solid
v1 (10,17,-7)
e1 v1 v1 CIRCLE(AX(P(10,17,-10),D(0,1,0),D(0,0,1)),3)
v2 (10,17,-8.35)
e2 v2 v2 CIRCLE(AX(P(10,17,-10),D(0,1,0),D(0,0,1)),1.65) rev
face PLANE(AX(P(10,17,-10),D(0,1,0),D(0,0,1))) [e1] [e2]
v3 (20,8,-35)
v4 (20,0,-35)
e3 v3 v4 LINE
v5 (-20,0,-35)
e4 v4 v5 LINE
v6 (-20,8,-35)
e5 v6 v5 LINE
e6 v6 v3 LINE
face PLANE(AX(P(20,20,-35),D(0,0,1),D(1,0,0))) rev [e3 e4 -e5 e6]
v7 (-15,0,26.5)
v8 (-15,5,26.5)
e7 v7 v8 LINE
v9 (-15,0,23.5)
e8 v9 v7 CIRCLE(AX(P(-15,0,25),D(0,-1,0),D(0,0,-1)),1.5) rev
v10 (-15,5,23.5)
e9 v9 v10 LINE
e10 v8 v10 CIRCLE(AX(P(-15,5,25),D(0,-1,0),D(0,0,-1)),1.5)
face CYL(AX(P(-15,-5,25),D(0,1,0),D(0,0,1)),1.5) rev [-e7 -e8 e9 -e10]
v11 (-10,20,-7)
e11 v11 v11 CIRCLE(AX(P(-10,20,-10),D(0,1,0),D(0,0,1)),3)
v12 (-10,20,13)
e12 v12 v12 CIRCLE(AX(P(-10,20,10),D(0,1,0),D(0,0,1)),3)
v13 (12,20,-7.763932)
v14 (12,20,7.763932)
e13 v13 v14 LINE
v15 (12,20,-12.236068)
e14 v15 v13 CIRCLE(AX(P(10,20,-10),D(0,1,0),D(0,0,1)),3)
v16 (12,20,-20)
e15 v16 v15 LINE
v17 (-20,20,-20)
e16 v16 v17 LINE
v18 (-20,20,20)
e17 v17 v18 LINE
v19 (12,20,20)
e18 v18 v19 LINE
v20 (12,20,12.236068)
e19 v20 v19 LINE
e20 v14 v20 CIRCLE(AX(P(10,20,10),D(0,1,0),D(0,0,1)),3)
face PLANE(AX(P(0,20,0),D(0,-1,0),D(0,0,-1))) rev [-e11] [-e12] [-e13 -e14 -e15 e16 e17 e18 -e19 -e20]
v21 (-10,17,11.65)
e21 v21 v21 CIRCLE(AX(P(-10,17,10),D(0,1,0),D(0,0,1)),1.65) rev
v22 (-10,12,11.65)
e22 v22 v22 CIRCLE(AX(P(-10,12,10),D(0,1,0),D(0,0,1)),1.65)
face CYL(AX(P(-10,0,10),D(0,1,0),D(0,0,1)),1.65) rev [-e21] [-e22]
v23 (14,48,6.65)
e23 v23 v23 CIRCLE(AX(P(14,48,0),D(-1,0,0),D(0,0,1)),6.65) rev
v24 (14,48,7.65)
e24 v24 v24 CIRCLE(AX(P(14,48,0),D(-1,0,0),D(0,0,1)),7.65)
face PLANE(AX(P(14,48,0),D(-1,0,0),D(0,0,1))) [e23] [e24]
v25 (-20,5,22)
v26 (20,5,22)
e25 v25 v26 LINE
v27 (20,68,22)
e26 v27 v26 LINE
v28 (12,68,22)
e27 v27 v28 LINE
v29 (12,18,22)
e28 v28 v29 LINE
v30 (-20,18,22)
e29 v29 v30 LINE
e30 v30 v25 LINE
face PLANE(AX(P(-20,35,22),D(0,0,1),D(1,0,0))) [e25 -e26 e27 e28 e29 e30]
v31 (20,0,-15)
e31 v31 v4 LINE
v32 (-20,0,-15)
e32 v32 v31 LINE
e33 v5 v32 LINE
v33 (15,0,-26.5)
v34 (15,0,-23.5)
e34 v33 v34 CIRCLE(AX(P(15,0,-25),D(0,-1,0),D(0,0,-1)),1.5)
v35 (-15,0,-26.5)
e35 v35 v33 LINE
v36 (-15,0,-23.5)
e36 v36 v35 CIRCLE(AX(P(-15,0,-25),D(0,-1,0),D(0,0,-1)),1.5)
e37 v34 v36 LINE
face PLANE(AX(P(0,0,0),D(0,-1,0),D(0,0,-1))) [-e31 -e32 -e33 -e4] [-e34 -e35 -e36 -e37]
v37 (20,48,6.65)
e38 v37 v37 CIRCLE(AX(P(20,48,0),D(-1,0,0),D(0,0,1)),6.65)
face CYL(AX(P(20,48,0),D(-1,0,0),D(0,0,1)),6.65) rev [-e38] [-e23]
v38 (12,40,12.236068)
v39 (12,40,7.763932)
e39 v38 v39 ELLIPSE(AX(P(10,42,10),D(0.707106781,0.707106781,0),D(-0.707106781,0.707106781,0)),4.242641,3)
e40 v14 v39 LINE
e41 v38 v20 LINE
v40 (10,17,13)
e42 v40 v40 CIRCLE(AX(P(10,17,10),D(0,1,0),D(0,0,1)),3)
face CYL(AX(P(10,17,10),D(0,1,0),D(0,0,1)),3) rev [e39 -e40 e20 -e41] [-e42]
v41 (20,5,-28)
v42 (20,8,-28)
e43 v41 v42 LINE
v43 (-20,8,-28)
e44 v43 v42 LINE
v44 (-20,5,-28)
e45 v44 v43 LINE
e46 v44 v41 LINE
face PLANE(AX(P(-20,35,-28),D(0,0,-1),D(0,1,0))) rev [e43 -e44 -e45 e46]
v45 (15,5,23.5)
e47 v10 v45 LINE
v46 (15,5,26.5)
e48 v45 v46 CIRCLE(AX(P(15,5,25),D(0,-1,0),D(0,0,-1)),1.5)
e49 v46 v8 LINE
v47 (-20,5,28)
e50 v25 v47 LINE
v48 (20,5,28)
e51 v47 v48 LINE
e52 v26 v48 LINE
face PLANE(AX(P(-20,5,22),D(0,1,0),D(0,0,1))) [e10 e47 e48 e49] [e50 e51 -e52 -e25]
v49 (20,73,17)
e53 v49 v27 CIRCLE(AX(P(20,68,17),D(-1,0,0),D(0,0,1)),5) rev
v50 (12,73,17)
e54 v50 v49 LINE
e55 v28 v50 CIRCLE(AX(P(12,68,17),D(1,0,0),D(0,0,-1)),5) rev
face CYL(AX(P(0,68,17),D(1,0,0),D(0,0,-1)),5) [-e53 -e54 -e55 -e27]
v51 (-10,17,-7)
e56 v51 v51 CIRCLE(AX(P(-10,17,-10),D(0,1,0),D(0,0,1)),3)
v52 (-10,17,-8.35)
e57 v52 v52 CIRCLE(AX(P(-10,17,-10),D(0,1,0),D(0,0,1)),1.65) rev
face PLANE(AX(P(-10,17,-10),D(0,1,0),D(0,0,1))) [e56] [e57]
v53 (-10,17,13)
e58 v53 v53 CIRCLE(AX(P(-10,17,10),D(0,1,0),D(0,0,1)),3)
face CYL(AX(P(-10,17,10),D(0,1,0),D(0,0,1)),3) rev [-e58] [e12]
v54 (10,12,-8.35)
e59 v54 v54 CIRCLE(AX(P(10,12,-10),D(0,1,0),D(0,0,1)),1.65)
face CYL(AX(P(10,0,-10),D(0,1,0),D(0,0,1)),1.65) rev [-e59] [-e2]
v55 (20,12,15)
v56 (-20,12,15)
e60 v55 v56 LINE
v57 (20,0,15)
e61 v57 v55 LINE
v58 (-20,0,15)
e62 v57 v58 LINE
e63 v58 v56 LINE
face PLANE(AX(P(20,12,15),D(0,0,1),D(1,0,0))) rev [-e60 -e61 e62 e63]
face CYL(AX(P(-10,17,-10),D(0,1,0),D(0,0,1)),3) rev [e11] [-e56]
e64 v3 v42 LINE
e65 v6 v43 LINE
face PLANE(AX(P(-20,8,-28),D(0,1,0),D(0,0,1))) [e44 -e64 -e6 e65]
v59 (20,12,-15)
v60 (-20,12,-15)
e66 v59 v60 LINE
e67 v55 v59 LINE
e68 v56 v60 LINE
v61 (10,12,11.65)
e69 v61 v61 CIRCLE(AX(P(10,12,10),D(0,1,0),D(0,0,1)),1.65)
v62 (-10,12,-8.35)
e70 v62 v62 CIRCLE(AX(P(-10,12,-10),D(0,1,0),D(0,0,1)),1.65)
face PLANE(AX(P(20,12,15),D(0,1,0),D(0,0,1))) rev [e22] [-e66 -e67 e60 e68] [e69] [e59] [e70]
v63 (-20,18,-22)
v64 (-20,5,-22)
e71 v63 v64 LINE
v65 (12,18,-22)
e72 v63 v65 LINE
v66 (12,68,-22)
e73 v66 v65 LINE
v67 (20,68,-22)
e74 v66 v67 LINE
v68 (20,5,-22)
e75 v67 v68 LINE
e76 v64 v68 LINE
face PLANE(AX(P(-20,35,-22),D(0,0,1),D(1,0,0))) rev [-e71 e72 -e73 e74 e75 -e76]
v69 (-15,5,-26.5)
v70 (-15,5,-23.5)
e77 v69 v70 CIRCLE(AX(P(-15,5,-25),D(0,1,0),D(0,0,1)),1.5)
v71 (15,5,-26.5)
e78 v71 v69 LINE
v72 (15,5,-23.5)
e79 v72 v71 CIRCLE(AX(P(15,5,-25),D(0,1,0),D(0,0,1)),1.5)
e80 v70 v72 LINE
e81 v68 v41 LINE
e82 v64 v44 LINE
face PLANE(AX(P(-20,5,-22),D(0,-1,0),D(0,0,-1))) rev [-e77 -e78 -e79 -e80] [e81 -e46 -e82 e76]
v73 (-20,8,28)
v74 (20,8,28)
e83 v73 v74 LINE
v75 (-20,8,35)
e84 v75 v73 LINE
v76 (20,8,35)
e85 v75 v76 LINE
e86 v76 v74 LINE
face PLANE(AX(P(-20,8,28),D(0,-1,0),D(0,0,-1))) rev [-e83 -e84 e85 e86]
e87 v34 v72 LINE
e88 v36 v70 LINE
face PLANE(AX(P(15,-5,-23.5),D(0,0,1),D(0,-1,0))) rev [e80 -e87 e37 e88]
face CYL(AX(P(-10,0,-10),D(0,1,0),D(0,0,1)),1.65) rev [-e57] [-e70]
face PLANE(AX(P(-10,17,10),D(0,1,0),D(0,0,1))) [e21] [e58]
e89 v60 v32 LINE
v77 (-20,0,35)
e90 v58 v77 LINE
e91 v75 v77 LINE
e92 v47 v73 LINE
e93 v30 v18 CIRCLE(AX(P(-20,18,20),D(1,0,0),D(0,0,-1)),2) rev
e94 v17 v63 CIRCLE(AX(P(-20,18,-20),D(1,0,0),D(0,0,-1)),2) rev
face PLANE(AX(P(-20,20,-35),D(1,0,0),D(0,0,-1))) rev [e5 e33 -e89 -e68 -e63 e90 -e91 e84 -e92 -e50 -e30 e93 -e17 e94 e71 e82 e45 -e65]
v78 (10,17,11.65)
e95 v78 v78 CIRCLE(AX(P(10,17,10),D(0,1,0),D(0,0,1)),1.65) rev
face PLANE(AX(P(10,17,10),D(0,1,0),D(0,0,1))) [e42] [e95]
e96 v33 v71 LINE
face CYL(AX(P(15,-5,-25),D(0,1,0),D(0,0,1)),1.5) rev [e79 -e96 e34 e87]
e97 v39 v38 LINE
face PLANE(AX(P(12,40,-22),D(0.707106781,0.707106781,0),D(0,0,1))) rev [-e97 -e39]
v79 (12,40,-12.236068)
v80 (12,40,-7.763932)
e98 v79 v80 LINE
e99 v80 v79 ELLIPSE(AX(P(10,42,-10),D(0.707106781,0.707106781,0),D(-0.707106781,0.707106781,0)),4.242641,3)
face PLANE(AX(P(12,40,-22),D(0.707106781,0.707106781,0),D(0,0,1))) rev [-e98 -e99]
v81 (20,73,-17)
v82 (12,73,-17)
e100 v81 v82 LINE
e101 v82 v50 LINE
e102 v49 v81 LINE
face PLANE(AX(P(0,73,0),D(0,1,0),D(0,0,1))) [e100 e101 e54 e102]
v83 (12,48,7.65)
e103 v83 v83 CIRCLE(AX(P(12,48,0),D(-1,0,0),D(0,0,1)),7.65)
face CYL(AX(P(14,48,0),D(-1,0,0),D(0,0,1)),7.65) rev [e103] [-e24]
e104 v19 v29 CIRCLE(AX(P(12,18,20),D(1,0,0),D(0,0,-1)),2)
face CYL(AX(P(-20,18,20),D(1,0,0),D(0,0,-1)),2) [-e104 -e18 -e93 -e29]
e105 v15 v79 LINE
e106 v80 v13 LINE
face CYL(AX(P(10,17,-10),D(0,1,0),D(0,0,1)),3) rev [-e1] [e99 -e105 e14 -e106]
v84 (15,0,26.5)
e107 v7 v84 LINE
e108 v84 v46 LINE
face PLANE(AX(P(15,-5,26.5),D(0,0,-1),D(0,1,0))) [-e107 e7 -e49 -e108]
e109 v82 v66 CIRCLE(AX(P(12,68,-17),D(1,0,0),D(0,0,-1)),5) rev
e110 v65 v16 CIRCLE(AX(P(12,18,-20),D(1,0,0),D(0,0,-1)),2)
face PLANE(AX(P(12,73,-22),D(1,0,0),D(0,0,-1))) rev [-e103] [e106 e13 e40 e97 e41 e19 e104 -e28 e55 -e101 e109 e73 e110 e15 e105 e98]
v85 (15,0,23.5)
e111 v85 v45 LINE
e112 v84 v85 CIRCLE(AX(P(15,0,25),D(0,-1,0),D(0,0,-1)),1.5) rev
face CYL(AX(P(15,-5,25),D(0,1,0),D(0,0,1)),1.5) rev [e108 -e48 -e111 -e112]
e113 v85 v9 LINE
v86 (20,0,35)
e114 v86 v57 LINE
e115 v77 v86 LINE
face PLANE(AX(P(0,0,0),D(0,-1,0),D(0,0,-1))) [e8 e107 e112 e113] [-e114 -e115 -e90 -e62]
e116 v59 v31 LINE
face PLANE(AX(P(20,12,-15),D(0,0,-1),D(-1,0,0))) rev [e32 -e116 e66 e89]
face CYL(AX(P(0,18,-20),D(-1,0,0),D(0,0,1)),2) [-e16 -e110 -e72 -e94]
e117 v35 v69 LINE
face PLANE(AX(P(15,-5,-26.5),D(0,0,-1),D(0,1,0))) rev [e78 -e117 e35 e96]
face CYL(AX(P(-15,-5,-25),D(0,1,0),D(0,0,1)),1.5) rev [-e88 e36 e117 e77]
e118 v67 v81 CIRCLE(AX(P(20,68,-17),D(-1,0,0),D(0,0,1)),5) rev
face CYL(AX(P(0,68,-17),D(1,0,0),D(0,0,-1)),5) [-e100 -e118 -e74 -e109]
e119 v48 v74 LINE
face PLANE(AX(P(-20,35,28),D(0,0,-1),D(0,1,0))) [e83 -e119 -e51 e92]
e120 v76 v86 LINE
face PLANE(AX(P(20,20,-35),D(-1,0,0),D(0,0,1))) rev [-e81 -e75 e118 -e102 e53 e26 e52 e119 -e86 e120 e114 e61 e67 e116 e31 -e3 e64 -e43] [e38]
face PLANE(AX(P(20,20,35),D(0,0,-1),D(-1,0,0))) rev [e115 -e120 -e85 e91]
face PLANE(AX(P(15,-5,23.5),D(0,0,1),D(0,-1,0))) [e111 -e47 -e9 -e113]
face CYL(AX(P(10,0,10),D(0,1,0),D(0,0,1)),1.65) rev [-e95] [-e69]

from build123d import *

# Parameters (mm, degrees)
SKETCH1_W           = 40
SKETCH1_H           = 70
BOSS_EXTRUDE1_DEPTH = 20
SKETCH2_W           = 30
SKETCH2_H           = 24
CUT_EXTRUDE1_DEPTH  = 57.789083458
SKETCH3_R           = 1.65
CUT_EXTRUDE2_DEPTH  = 46
SKETCH5_R           = 3
CUT_EXTRUDE3_DEPTH  = 3
SKETCH9_W           = 6
SKETCH9_H           = 30
CUT_EXTRUDE6_DEPTH  = 57.789083458
CUT_EXTRUDE7_DEPTH  = 10
SKETCH14_W          = 8
SKETCH14_H          = 44
BOSS_EXTRUDE3_DEPTH = 53
SKETCH16_R          = 6.65
CUT_EXTRUDE11_DEPTH = 88.051708771
SKETCH17_R          = 7.65
CUT_EXTRUDE12_DEPTH = 2
FILLET2_R           = 5
SKETCH18_R          = 3
CUT_EXTRUDE13_DEPTH = 18
CHAMFER1_SIZE       = 2
SKETCH19_W          = 7
SKETCH19_H          = 12
CUT_EXTRUDE14_DEPTH = 91.29950166
FILLET4_R           = 2


with BuildPart() as part:
    # Sketch1 → Boss-Extrude1 (new body)
    with BuildSketch(Plane(origin=(0, 0, 0), x_dir=(1, 0, 0), z_dir=(0, 1, 0))):
        Rectangle(SKETCH1_W, SKETCH1_H)
    extrude(amount=BOSS_EXTRUDE1_DEPTH)

    # Sketch2 → Cut-Extrude1 (cut, through all)
    with BuildSketch(Plane.ZY.offset(20)):
        Rectangle(SKETCH2_W, SKETCH2_H)
    extrude(amount=-CUT_EXTRUDE1_DEPTH, mode=Mode.SUBTRACT)

    # Sketch3 → Cut-Extrude2 (cut, through all)
    with BuildSketch(Plane(origin=(0, 20, 0), x_dir=(1, 0, 0), z_dir=(0, 1, 0))):
        with Locations(Location((-10, 10, 0), (0, 0, 270))):
            Circle(SKETCH3_R)
        with Locations(Location((10, 10, 0), (0, 0, 270))):
            Circle(SKETCH3_R)
        with Locations(Location((10, -10, 0), (0, 0, 270))):
            Circle(SKETCH3_R)
        with Locations(Location((-10, -10, 0), (0, 0, 270))):
            Circle(SKETCH3_R)
    extrude(amount=-CUT_EXTRUDE2_DEPTH, mode=Mode.SUBTRACT)

    # Sketch5 → Cut-Extrude3 (cut)
    with BuildSketch(Plane(origin=(0, 20, 0), x_dir=(1, 0, 0), z_dir=(0, 1, 0))):
        with Locations(Location((-10, 10, 0), (0, 0, 270))):
            Circle(SKETCH5_R)
        with Locations(Location((10, 10, 0), (0, 0, 270))):
            Circle(SKETCH5_R)
        with Locations(Location((10, -10, 0), (0, 0, 270))):
            Circle(SKETCH5_R)
        with Locations(Location((-10, -10, 0), (0, 0, 270))):
            Circle(SKETCH5_R)
    extrude(amount=-CUT_EXTRUDE3_DEPTH, mode=Mode.SUBTRACT)

    # Sketch9 → Cut-Extrude6 (cut, through all)
    with BuildSketch(Plane(origin=(20, 0, 0), x_dir=(0, 0, -1), z_dir=(1, 0, 0))):
        with Locations((25, 20)):
            Rectangle(SKETCH9_W, SKETCH9_H)
    cut_extrude6 = extrude(amount=-CUT_EXTRUDE6_DEPTH, mode=Mode.SUBTRACT)

    # Sketch10 → Cut-Extrude7 (cut)
    with BuildSketch(Plane(origin=(0, 5, 0), x_dir=(1, 0, 0), z_dir=(0, 1, 0))):
        with BuildLine():
            Line((15, 23.5), (-15, 23.5))
            ThreePointArc((-15, 23.5), (-16.5, 25), (-15, 26.5))
            Line((-15, 26.5), (15, 26.5))
            ThreePointArc((15, 26.5), (16.5, 25), (15, 23.5))
        make_face()
    cut_extrude7 = extrude(amount=-CUT_EXTRUDE7_DEPTH, mode=Mode.SUBTRACT)

    # Mirror2: Cut-Extrude6, Cut-Extrude7 across plane
    add(cut_extrude6.mirror(Plane.XY), mode=Mode.SUBTRACT)
    add(cut_extrude7.mirror(Plane.XY), mode=Mode.SUBTRACT)

    # Sketch14 → Boss-Extrude3 (add)
    with BuildSketch(Plane(origin=(0, 20, 0), x_dir=(1, 0, 0), z_dir=(0, 1, 0))):
        with Locations((16, 0)):
            Rectangle(SKETCH14_W, SKETCH14_H)
    extrude(amount=BOSS_EXTRUDE3_DEPTH)

    # Sketch16 → Cut-Extrude11 (cut, through all)
    with BuildSketch(Plane.ZY.offset(-12)):
        with Locations((0, 48)):
            Circle(SKETCH16_R)
    extrude(amount=-CUT_EXTRUDE11_DEPTH, mode=Mode.SUBTRACT)

    # Sketch17 → Cut-Extrude12 (cut)
    with BuildSketch(Plane.ZY.offset(-12)):
        with Locations((0, 48)):
            Circle(SKETCH17_R)
    extrude(amount=-CUT_EXTRUDE12_DEPTH, mode=Mode.SUBTRACT)

    # Fillet2
    fillet2_edges = [part.edges().sort_by_distance(p)[0] for p in [
        (16, 73, -22),
        (16, 73, 22),
    ]]
    fillet(fillet2_edges, radius=FILLET2_R)

    # Sketch18 → Cut-Extrude13 (cut)
    with BuildSketch(Plane(origin=(0, 38, 0), x_dir=(1, 0, 0), z_dir=(0, 1, 0))):
        with Locations(Location((10, 10, 0), (0, 0, 270))):
            Circle(SKETCH18_R)
        with Locations(Location((10, -10, 0), (0, 0, 270))):
            Circle(SKETCH18_R)
    extrude(amount=-CUT_EXTRUDE13_DEPTH, mode=Mode.SUBTRACT)

    # Chamfer1
    # the kernel refuses this chamfer: 2 mm, written as the material it takes off along each edge
    with BuildSketch(Plane(origin=(12, 38, 17.379433953), x_dir=(-0.02749587661058651, 0.9996219169112968, 0), z_dir=(0, 0, -1))) as chamfer1_piece_1_section:
        Polygon((CHAMFER1_SIZE * 0.999621916911, CHAMFER1_SIZE * 0.0274958766106), (-CHAMFER1_SIZE * 0.0274958766106, CHAMFER1_SIZE * 0.999621916911), (0, 0), align=None)
    chamfer1_piece_1 = extrude(amount=14.758867907, mode=Mode.PRIVATE)
    chamfer1_piece_1 = chamfer1_piece_1 & Plane(origin=(10, 38.83392746, 10), x_dir=(0, 0, 1), z_dir=(0, 1, 0)) * Cylinder(3, 38, mode=Mode.PRIVATE)
    add(chamfer1_piece_1, mode=Mode.SUBTRACT)
    with BuildSketch(Plane(origin=(12, 38, -2.620566047), x_dir=(-0.02749587661058651, 0.9996219169112968, 0), z_dir=(0, 0, -1))) as chamfer1_piece_2_section:
        Polygon((CHAMFER1_SIZE * 0.999621916911, CHAMFER1_SIZE * 0.0274958766106), (-CHAMFER1_SIZE * 0.0274958766106, CHAMFER1_SIZE * 0.999621916911), (0, 0), align=None)
    chamfer1_piece_2 = extrude(amount=14.758867907, mode=Mode.PRIVATE)
    chamfer1_piece_2 = chamfer1_piece_2 & Plane(origin=(10, 38.833927472, -10), x_dir=(0, 0, 1), z_dir=(0, 1, 0)) * Cylinder(3, 38, mode=Mode.PRIVATE)
    add(chamfer1_piece_2, mode=Mode.SUBTRACT)

    # Sketch19 → Cut-Extrude14 (cut, through all)
    with BuildSketch(Plane(origin=(20, 0, 0), x_dir=(0, 0, -1), z_dir=(1, 0, 0))):
        with Locations((-31.5, 14)):
            Rectangle(SKETCH19_W, SKETCH19_H)
    cut_extrude14 = extrude(amount=-CUT_EXTRUDE14_DEPTH, mode=Mode.SUBTRACT)

    # Mirror3: Cut-Extrude14 across plane
    add(cut_extrude14.mirror(Plane.XY), mode=Mode.SUBTRACT)

    # Fillet4
    fillet4_edges = [part.edges().sort_by_distance(p)[0] for p in [
        (-4, 20, 22),
        (-4, 20, -22),
    ]]
    fillet(fillet4_edges, radius=FILLET4_R)


solid = part.part
